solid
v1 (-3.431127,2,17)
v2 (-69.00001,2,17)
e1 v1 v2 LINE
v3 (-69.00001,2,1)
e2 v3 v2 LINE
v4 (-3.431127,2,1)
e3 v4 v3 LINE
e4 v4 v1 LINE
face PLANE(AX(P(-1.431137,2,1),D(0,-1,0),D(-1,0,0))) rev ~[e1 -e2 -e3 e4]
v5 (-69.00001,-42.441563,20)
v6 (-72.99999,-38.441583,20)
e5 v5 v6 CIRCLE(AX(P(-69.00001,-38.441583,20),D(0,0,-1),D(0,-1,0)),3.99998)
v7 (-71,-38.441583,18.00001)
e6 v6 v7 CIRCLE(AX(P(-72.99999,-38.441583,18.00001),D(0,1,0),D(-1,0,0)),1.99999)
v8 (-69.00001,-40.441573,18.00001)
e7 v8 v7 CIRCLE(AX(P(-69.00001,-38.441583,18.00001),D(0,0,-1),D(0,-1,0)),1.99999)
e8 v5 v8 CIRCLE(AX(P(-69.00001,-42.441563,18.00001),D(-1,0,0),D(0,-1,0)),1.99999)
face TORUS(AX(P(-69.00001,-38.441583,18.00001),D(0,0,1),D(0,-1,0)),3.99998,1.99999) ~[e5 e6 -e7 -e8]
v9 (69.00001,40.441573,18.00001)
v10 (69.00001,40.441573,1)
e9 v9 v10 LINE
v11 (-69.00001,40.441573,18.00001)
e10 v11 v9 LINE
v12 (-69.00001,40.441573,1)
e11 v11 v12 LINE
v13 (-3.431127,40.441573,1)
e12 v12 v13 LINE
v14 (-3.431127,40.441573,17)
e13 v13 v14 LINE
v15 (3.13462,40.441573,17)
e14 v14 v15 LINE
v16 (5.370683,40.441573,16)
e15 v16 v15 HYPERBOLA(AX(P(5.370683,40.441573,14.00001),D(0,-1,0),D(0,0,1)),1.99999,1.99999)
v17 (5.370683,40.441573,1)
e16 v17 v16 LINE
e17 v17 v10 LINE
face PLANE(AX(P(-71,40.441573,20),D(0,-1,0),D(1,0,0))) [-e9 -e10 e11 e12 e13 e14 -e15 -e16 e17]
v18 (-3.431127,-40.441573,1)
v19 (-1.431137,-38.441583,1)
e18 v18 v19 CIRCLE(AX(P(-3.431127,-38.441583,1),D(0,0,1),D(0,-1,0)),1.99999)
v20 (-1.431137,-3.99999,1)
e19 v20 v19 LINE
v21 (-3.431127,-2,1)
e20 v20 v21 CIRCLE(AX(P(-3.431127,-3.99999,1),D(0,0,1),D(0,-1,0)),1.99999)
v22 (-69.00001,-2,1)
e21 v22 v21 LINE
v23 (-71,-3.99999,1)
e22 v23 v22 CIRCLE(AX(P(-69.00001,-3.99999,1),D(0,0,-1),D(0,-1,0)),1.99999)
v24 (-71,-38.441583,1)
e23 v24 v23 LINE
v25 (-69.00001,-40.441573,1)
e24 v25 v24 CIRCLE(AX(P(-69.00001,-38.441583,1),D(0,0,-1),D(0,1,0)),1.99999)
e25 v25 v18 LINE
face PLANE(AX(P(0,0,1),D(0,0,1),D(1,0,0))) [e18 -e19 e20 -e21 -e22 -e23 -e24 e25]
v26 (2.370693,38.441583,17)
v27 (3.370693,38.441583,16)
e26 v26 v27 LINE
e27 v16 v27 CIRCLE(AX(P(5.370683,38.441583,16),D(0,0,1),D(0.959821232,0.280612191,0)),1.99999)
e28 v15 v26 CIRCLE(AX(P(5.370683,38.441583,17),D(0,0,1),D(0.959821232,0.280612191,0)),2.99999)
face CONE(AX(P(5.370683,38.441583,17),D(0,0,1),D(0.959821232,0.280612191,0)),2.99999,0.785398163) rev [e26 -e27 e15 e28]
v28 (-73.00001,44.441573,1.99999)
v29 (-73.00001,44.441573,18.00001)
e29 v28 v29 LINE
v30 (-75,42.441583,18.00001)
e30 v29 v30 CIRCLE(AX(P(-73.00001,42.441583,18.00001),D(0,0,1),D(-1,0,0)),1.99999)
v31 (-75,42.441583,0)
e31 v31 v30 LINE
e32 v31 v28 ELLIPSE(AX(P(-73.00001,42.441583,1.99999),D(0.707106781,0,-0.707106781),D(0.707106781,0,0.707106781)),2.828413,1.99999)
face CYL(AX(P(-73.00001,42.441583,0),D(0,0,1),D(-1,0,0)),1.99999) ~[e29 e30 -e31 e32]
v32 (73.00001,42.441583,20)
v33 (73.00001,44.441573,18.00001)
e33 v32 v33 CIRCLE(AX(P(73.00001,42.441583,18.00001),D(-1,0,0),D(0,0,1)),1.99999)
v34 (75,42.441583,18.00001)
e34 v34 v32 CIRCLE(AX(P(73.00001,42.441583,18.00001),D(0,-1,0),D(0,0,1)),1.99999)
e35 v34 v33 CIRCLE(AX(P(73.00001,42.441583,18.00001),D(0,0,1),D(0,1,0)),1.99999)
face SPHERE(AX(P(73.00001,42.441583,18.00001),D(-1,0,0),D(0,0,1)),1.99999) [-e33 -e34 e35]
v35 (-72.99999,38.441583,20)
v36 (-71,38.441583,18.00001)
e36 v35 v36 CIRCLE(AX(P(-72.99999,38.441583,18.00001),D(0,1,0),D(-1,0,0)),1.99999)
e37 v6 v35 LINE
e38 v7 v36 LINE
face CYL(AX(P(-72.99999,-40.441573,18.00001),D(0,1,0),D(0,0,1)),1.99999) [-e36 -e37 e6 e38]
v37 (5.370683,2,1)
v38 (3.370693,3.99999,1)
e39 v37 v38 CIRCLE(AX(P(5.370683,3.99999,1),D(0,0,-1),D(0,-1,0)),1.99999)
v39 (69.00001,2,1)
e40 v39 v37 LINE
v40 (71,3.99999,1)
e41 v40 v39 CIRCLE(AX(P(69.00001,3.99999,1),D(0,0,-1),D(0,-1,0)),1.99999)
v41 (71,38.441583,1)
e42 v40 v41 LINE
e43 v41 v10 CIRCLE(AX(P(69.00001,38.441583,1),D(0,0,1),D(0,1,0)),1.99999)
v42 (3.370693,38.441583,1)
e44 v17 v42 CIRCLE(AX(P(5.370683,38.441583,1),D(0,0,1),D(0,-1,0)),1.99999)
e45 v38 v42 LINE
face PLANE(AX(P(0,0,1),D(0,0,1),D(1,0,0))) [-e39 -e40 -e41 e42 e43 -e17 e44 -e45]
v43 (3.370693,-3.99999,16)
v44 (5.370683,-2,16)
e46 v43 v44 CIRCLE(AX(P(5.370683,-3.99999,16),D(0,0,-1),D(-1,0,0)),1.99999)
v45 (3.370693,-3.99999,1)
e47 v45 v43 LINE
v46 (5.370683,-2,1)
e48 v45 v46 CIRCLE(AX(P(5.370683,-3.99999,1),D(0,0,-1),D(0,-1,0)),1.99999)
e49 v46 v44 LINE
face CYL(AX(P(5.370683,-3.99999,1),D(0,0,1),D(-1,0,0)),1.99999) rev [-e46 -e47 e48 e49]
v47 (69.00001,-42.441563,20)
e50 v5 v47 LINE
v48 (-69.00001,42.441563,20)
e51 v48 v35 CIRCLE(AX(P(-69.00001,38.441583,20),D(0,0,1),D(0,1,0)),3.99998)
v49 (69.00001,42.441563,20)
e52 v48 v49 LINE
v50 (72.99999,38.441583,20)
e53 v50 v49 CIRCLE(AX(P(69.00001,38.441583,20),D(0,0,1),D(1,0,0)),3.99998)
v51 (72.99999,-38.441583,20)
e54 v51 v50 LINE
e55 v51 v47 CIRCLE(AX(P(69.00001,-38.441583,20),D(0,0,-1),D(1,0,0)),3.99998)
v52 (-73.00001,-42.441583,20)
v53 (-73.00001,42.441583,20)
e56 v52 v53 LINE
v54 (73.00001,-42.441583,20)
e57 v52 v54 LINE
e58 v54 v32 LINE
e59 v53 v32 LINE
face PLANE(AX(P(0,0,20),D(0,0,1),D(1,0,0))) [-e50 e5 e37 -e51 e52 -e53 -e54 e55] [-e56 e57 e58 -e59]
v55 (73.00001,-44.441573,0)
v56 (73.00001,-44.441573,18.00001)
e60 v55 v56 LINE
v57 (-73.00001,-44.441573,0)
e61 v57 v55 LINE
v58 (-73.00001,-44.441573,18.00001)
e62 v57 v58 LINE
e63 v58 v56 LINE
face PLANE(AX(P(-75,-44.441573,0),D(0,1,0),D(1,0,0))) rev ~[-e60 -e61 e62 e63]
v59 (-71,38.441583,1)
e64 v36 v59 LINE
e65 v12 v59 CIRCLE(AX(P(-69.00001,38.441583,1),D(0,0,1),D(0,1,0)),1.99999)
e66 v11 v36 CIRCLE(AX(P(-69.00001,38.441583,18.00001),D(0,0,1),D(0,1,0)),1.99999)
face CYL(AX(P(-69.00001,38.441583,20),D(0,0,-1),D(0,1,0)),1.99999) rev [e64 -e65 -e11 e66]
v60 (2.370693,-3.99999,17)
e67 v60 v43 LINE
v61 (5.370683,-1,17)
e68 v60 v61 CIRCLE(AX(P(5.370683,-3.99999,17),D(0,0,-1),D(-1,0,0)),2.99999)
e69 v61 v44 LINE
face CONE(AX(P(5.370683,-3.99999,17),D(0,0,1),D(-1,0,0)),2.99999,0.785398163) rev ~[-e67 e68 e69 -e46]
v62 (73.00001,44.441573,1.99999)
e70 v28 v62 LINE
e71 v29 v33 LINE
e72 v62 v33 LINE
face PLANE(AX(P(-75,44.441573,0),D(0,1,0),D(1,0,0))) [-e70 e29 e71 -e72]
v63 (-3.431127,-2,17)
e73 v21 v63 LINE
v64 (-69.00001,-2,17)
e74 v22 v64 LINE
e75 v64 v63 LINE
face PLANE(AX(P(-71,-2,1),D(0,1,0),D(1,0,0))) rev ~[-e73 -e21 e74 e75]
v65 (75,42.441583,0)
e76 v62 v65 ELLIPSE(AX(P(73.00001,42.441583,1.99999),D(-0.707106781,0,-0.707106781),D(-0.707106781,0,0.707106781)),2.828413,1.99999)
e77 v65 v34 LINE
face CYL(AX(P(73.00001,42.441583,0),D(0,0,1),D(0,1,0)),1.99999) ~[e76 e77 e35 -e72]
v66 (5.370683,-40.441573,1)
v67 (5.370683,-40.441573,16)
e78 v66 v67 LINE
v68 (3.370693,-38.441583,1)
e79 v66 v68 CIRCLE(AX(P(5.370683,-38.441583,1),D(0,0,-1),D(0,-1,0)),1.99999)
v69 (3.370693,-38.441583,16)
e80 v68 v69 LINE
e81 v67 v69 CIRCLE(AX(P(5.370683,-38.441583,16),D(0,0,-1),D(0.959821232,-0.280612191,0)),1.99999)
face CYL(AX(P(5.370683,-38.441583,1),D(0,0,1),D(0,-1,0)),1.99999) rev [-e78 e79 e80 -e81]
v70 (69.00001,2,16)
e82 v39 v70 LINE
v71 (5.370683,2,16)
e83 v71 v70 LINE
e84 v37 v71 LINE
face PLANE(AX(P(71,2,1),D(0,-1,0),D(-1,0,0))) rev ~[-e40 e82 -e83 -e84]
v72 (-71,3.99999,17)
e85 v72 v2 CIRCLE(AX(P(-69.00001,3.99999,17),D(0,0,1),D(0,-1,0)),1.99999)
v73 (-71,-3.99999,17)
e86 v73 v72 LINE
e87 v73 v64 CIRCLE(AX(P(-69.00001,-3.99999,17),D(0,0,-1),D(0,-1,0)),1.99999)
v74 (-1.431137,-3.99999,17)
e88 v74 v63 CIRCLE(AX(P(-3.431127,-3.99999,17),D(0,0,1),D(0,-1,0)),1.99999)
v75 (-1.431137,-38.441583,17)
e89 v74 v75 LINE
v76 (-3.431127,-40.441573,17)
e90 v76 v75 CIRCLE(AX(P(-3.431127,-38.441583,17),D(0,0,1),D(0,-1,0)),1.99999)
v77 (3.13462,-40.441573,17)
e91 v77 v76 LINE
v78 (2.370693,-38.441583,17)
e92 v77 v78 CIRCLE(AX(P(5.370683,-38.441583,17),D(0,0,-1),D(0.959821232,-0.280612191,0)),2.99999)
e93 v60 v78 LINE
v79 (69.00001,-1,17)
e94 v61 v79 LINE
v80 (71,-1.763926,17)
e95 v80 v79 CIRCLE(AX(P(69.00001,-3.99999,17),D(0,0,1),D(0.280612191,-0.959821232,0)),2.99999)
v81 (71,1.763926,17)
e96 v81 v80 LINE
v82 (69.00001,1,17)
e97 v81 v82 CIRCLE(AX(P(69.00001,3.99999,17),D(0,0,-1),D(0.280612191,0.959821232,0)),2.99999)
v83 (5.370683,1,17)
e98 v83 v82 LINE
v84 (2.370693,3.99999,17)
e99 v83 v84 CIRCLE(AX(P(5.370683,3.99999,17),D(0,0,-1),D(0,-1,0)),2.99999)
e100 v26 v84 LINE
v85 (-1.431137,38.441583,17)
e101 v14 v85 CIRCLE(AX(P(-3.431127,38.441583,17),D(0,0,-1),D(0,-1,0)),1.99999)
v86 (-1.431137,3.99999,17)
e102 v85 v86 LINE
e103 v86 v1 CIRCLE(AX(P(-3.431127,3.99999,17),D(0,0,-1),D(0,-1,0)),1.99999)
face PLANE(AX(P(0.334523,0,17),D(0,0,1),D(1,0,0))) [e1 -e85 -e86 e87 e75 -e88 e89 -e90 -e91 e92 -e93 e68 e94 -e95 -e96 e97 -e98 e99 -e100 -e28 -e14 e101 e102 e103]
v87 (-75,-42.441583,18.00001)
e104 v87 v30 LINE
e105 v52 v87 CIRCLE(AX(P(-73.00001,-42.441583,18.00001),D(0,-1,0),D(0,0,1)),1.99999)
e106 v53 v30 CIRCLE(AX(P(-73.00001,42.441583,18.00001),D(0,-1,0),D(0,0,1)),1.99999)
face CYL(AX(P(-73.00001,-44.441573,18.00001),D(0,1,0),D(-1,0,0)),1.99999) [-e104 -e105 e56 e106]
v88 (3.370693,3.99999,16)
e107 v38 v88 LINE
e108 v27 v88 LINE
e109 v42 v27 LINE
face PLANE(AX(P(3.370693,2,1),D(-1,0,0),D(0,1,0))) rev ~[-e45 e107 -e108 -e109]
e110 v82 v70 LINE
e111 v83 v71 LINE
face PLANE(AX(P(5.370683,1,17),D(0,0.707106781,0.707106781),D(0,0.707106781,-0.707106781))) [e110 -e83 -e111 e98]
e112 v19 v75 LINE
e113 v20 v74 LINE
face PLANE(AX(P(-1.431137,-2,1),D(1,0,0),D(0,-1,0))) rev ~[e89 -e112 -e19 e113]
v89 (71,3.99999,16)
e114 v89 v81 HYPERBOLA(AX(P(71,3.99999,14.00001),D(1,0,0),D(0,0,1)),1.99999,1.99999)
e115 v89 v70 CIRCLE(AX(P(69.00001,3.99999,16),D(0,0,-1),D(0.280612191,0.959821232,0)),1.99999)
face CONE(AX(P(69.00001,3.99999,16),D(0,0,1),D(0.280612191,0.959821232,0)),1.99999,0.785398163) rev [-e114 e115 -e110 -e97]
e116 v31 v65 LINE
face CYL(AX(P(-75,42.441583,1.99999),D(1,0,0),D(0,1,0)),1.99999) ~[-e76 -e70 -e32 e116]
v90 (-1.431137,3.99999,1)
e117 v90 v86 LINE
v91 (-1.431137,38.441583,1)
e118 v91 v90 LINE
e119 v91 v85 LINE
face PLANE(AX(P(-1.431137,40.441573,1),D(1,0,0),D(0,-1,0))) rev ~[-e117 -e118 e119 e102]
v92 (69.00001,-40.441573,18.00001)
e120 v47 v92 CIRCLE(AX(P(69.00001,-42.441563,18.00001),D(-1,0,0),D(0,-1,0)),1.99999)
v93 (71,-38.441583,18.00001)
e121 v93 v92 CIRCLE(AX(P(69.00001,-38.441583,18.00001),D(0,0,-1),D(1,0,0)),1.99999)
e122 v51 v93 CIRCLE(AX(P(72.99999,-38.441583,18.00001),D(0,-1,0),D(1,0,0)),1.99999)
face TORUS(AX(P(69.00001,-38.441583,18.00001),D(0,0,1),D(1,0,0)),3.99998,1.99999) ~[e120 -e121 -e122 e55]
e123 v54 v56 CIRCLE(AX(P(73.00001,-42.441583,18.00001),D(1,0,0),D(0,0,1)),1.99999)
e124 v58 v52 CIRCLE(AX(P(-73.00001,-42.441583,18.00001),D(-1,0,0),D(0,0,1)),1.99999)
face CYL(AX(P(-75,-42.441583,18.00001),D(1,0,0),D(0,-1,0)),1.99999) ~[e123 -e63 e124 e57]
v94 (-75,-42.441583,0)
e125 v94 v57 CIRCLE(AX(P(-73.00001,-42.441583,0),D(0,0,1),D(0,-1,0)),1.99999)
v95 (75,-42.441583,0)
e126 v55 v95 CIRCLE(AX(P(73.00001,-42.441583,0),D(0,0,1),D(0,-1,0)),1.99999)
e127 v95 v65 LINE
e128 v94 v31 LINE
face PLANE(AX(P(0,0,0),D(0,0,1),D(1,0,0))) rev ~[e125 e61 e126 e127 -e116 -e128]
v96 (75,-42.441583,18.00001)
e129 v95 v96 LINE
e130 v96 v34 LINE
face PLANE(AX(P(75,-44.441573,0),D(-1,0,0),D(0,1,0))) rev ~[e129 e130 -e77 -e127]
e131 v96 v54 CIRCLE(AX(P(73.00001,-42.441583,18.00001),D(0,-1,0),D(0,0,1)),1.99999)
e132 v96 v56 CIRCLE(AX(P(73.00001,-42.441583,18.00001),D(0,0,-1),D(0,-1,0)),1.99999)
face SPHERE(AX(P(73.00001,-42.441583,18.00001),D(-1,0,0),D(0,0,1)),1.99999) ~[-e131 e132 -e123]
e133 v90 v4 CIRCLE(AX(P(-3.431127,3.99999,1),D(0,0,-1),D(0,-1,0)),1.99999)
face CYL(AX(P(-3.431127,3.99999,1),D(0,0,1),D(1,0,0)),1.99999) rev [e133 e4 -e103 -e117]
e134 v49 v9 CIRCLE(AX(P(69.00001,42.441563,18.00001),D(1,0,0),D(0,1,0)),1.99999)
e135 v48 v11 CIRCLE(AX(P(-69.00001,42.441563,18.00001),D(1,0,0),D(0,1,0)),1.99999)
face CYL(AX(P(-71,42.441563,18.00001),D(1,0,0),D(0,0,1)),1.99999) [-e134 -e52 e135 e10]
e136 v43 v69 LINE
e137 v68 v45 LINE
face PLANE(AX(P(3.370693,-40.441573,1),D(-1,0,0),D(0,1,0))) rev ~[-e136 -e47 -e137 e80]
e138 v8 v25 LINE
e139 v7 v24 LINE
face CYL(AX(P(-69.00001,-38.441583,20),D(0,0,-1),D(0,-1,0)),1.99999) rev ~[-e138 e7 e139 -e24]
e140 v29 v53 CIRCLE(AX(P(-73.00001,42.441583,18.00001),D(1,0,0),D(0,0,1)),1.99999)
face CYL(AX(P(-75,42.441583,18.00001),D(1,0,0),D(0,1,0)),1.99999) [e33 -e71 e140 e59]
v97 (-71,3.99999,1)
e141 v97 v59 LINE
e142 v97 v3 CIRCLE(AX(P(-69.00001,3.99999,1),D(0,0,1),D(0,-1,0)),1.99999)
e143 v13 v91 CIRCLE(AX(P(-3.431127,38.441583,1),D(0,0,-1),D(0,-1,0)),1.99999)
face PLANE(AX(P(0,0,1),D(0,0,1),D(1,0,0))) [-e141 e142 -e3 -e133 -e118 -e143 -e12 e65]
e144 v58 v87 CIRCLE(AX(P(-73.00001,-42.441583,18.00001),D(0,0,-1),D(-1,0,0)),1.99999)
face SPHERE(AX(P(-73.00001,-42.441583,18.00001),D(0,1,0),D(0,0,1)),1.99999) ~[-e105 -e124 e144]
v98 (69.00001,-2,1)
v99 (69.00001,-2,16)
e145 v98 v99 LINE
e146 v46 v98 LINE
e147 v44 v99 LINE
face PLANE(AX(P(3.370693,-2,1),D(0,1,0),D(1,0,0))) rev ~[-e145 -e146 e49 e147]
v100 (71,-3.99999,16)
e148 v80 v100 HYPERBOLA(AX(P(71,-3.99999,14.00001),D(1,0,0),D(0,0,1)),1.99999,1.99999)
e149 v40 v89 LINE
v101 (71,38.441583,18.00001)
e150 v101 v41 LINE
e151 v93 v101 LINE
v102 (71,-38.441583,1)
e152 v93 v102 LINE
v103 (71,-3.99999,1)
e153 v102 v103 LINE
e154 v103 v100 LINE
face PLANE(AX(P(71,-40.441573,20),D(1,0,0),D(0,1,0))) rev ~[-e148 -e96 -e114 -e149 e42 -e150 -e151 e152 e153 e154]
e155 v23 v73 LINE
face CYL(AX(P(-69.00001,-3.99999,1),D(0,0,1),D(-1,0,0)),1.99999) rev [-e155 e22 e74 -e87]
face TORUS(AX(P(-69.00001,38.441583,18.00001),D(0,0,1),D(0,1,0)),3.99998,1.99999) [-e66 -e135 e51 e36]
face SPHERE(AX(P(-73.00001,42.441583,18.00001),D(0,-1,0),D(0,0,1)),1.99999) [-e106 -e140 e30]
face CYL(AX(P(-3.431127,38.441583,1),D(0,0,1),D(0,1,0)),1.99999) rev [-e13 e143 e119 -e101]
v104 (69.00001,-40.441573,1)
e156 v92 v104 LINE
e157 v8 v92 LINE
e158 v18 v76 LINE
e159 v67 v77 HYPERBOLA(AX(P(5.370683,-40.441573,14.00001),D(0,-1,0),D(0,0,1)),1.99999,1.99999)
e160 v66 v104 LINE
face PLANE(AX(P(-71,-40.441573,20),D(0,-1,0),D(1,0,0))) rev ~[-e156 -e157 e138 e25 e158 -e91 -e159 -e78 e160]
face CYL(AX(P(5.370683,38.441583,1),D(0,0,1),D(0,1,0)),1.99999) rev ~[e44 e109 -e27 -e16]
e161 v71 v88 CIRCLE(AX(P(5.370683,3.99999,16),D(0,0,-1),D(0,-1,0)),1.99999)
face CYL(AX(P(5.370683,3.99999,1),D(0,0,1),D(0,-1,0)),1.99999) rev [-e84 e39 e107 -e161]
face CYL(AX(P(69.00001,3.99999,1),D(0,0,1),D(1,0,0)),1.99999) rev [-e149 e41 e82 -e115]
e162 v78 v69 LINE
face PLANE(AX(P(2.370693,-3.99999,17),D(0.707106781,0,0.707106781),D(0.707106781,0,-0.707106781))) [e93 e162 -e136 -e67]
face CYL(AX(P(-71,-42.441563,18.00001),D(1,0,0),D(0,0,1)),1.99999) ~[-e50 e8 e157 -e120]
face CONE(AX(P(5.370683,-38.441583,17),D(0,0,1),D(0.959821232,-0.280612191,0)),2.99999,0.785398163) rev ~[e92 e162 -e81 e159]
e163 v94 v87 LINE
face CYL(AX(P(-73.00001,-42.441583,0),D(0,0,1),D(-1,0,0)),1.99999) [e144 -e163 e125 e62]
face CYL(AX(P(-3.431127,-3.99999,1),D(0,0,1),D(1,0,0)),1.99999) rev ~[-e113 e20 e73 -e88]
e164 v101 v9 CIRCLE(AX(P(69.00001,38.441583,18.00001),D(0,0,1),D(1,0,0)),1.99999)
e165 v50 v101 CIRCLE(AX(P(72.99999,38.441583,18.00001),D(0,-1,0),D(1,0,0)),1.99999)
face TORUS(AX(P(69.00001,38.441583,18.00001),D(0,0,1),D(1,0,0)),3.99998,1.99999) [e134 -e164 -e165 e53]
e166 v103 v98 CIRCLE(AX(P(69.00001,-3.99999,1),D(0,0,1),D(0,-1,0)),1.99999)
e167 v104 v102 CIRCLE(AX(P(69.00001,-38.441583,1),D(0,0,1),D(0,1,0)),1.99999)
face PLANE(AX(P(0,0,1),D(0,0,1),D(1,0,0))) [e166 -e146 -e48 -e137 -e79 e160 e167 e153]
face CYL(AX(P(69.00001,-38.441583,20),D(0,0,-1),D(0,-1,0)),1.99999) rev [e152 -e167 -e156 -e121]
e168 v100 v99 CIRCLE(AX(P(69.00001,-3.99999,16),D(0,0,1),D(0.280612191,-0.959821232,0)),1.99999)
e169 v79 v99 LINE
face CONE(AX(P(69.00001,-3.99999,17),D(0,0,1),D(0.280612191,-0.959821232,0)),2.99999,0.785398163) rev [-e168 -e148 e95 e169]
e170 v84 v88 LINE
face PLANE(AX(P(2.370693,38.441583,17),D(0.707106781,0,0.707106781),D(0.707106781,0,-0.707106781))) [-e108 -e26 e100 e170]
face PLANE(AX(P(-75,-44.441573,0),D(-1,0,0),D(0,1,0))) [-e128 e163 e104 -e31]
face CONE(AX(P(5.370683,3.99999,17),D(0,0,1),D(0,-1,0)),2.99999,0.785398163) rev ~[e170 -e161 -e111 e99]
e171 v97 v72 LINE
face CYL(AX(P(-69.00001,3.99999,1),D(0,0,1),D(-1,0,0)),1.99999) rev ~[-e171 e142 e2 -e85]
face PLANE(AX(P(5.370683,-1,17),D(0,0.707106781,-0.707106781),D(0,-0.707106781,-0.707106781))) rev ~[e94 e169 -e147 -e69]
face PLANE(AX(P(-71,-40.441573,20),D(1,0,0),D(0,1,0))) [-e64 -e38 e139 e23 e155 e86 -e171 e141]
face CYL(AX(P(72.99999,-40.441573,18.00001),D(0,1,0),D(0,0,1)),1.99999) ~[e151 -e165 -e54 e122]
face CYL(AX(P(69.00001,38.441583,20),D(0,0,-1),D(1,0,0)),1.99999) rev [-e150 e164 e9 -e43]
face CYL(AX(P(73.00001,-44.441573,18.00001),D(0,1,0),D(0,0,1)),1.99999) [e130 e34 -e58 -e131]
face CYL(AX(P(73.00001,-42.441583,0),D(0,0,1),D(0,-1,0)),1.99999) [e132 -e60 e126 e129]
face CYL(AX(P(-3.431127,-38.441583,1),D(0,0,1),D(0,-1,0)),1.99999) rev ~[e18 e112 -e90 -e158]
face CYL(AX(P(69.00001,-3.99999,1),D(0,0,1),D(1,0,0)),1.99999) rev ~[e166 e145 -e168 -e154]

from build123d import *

# Parameters (mm, degrees)
F0_W         = 150
F0_H         = 88.883145673
F1_DEPTH     = 20
F2_W         = 142
F2_H         = 80.883145673
F3_DEPTH     = 19
F5_DEPTH     = 16
F6_R         = 1.99999
F7_T1_DEPTH  = 63.6293265809
F7_T3_DEPTH  = 34.4415928365
F7_T5_DEPTH  = 34.4415928365
F7_T8_ANGLE  = 90
F7_T10_ANGLE = 90
F7_T14_ANGLE = 163.703254406
F7_T19_ANGLE = 163.703254406
F7_T24_ANGLE = 163.703254406
F7_T29_ANGLE = 163.703254406


# Not quite as in the source:
# - a fillet or chamfer that OpenCascade refuses, or shapes differently, is made with other operations: its cross-section is extruded or revolved along the edge and cut away or added
# - a fillet or chamfer is up to 0.001 mm smaller than in the source, because OpenCascade refuses the exact size
# - a feature names something its author has since deleted; it is built from what else it names


with BuildPart() as f1:
    # F0 (on Top) → F1 (new body)
    with BuildSketch(Plane.XY):
        Rectangle(F0_W, F0_H)
    extrude(amount=F1_DEPTH)

    # F2 (on face) → F3 (cut)
    with BuildSketch(Plane.XY.offset(20)):
        Rectangle(F2_W, F2_H)
    extrude(amount=-F3_DEPTH, mode=Mode.SUBTRACT)

    # F4 (on face) → F5 (join)
    with BuildSketch(Plane.XY.offset(1)):
        Polygon((3.3706934191, -2), (71, -2), (71, 2), (3.3706934191, 2), (3.3706934191, 40.4415728365), (-1.4311365085, 40.4415728365), (-1.4311365085, 2), (-71, 2), (-71, -2), (-1.4311365085, -2), (-1.4311365085, -40.4415728365), (3.3706934191, -40.4415728365), align=None)
    extrude(amount=F5_DEPTH)

    # F6 (radius 2 in the source; OpenCascade refuses exactly that, so slightly less here)
    f6_edges = [f1.edges().sort_by_distance(p)[0] for p in [
        (-75, 0, 20),
        (0, 44.441573, 20),
        (0, -44.441573, 20),
        (75, 0, 20),
        (-75, -44.441573, 10),
        (-75, 44.441573, 10),
        (75, -44.441573, 10),
        (75, 44.441573, 10),
        (0, 44.441573, 0),
        (-71, -40.441573, 10.5),
        (-71, 40.441573, 10.5),
        (71, -40.441573, 10.5),
        (71, 40.441573, 10.5),
        (71, 2, 9),
        (71, -2, 9),
        (71, 0, 20),
        (0, 40.441573, 20),
        (0, -40.441573, 20),
        (-71, 0, 20),
        (-1.431137, 2, 9),
        (3.370693, 2, 9),
        (-1.431137, -2, 9),
        (-1.431137, 40.441573, 9),
        (3.370693, 40.441573, 9),
        (-71, -2, 9),
        (-71, 2, 9),
        (3.370693, -40.441573, 9),
        (-1.431137, -40.441573, 9),
        (3.370693, -2, 9),
    ]]
    fillet(f6_edges, radius=F6_R)

    # F7: chamfer of 1 on 6 edges, made by hand

    # F7_s2 → F7_t1 (cut)
    with BuildSketch(Plane.YZ.offset(5.3706834191)):
        Polygon((1, 17), (2, 16), (2, 17), align=None)
        Polygon((-1, 17), (-2, 16), (-2, 17), align=None)
    extrude(amount=F7_T1_DEPTH, mode=Mode.SUBTRACT)

    # F7_s4 → F7_t3 (cut)
    with BuildSketch(Plane.XZ.offset(3.99999)):
        Polygon((2.3706934191, 17), (3.3706934191, 16), (3.3706934191, 17), align=None)
    extrude(amount=F7_T3_DEPTH, mode=Mode.SUBTRACT)

    # F7_s6 → F7_t5 (cut)
    with BuildSketch(Plane.XZ.offset(-38.4415828365)):
        Polygon((2.3706934191, 17), (3.3706934191, 16), (3.3706934191, 17), align=None)
    extrude(amount=F7_T5_DEPTH, mode=Mode.SUBTRACT)

    # F7_s7 → F7_t8 (revolve, cut)
    with BuildSketch(Plane.XZ.offset(3.99999)):
        Polygon((2.3706934191, 17), (3.3706934191, 16), (3.3706934191, 17), align=None)
    revolve(axis=Axis((5.3706834191, -3.99999, 17), (0, 0, -1)), revolution_arc=F7_T8_ANGLE, mode=Mode.SUBTRACT)

    # F7_s9 → F7_t10 (revolve, cut)
    with BuildSketch(Plane.YZ.offset(5.3706834191)):
        Polygon((1, 17), (2, 16), (2, 17), align=None)
    revolve(axis=Axis((5.3706834191, 3.99999, 17), (0, 0, -1)), revolution_arc=F7_T10_ANGLE, mode=Mode.SUBTRACT)


with BuildPart() as f7_tool12:
    # F7_s13 → F7_t14 (revolve)
    with BuildSketch(Plane(origin=(-9.930856522, 33.9680428578, 0), x_dir=(0, 0, 1), z_dir=(0.2806121914, -0.9598212323, 0))):
        Polygon((17, -18.9420627796), (16, -17.9420627796), (17, -17.9420627796), align=None)
    revolve(axis=Axis((5.3706834191, 38.4415828365, 17), (0, 0, 1)), revolution_arc=F7_T14_ANGLE)

    split(bisect_by=Plane.XZ.offset(-40.4415728365), keep=Keep.TOP)


with BuildPart() as f1_1:
    add(f1.part)

    # F7_t11: cut F7_tool12
    add(f7_tool12.part, mode=Mode.SUBTRACT)


with BuildPart() as f7_tool17:
    # F7_s18 → F7_t19 (revolve)
    with BuildSketch(Plane(origin=(-9.930856522, -33.9680428578, 0), x_dir=(0, 0, 1), z_dir=(0.2806121914, 0.9598212323, 0))):
        Polygon((17, 18.9420627796), (16, 17.9420627796), (17, 17.9420627796), align=None)
    revolve(axis=Axis((5.3706834191, -38.4415828365, 17), (0, 0, -1)), revolution_arc=F7_T19_ANGLE)

    split(bisect_by=Plane.XZ.offset(40.4415728365), keep=Keep.BOTTOM)


with BuildPart() as f1_2:
    add(f1_1.part)

    # F7_t16: cut F7_tool17
    add(f7_tool17.part, mode=Mode.SUBTRACT)


with BuildPart() as f7_tool22:
    # F7_s23 → F7_t24 (revolve)
    with BuildSketch(Plane(origin=(62.4893808118, 18.2693208905, 0), x_dir=(0, 0, 1), z_dir=(-0.9598212323, -0.2806121914, 0))):
        Polygon((17, -26.201509346), (16, -25.201509346), (17, -25.201509346), align=None)
    revolve(axis=Axis((69.00001, -3.99999, 17), (0, 0, 1)), revolution_arc=F7_T24_ANGLE)

    split(bisect_by=Plane.YZ.offset(71), keep=Keep.BOTTOM)


with BuildPart() as f1_3:
    add(f1_2.part)

    # F7_t21: cut F7_tool22
    add(f7_tool22.part, mode=Mode.SUBTRACT)


with BuildPart() as f7_tool27:
    # F7_s28 → F7_t29 (revolve)
    with BuildSketch(Plane(origin=(62.4893808118, -18.2693208905, 0), x_dir=(0, 0, 1), z_dir=(-0.9598212323, 0.2806121914, 0))):
        Polygon((16, 25.201509346), (17, 26.201509346), (17, 25.201509346), align=None)
    revolve(axis=Axis((69.00001, 3.99999, 17), (0, 0, -1)), revolution_arc=F7_T29_ANGLE)

    split(bisect_by=Plane.YZ.offset(71), keep=Keep.BOTTOM)


with BuildPart() as f1_4:
    add(f1_3.part)

    # F7_t26: cut F7_tool27
    add(f7_tool27.part, mode=Mode.SUBTRACT)


solid = f1_4.part
